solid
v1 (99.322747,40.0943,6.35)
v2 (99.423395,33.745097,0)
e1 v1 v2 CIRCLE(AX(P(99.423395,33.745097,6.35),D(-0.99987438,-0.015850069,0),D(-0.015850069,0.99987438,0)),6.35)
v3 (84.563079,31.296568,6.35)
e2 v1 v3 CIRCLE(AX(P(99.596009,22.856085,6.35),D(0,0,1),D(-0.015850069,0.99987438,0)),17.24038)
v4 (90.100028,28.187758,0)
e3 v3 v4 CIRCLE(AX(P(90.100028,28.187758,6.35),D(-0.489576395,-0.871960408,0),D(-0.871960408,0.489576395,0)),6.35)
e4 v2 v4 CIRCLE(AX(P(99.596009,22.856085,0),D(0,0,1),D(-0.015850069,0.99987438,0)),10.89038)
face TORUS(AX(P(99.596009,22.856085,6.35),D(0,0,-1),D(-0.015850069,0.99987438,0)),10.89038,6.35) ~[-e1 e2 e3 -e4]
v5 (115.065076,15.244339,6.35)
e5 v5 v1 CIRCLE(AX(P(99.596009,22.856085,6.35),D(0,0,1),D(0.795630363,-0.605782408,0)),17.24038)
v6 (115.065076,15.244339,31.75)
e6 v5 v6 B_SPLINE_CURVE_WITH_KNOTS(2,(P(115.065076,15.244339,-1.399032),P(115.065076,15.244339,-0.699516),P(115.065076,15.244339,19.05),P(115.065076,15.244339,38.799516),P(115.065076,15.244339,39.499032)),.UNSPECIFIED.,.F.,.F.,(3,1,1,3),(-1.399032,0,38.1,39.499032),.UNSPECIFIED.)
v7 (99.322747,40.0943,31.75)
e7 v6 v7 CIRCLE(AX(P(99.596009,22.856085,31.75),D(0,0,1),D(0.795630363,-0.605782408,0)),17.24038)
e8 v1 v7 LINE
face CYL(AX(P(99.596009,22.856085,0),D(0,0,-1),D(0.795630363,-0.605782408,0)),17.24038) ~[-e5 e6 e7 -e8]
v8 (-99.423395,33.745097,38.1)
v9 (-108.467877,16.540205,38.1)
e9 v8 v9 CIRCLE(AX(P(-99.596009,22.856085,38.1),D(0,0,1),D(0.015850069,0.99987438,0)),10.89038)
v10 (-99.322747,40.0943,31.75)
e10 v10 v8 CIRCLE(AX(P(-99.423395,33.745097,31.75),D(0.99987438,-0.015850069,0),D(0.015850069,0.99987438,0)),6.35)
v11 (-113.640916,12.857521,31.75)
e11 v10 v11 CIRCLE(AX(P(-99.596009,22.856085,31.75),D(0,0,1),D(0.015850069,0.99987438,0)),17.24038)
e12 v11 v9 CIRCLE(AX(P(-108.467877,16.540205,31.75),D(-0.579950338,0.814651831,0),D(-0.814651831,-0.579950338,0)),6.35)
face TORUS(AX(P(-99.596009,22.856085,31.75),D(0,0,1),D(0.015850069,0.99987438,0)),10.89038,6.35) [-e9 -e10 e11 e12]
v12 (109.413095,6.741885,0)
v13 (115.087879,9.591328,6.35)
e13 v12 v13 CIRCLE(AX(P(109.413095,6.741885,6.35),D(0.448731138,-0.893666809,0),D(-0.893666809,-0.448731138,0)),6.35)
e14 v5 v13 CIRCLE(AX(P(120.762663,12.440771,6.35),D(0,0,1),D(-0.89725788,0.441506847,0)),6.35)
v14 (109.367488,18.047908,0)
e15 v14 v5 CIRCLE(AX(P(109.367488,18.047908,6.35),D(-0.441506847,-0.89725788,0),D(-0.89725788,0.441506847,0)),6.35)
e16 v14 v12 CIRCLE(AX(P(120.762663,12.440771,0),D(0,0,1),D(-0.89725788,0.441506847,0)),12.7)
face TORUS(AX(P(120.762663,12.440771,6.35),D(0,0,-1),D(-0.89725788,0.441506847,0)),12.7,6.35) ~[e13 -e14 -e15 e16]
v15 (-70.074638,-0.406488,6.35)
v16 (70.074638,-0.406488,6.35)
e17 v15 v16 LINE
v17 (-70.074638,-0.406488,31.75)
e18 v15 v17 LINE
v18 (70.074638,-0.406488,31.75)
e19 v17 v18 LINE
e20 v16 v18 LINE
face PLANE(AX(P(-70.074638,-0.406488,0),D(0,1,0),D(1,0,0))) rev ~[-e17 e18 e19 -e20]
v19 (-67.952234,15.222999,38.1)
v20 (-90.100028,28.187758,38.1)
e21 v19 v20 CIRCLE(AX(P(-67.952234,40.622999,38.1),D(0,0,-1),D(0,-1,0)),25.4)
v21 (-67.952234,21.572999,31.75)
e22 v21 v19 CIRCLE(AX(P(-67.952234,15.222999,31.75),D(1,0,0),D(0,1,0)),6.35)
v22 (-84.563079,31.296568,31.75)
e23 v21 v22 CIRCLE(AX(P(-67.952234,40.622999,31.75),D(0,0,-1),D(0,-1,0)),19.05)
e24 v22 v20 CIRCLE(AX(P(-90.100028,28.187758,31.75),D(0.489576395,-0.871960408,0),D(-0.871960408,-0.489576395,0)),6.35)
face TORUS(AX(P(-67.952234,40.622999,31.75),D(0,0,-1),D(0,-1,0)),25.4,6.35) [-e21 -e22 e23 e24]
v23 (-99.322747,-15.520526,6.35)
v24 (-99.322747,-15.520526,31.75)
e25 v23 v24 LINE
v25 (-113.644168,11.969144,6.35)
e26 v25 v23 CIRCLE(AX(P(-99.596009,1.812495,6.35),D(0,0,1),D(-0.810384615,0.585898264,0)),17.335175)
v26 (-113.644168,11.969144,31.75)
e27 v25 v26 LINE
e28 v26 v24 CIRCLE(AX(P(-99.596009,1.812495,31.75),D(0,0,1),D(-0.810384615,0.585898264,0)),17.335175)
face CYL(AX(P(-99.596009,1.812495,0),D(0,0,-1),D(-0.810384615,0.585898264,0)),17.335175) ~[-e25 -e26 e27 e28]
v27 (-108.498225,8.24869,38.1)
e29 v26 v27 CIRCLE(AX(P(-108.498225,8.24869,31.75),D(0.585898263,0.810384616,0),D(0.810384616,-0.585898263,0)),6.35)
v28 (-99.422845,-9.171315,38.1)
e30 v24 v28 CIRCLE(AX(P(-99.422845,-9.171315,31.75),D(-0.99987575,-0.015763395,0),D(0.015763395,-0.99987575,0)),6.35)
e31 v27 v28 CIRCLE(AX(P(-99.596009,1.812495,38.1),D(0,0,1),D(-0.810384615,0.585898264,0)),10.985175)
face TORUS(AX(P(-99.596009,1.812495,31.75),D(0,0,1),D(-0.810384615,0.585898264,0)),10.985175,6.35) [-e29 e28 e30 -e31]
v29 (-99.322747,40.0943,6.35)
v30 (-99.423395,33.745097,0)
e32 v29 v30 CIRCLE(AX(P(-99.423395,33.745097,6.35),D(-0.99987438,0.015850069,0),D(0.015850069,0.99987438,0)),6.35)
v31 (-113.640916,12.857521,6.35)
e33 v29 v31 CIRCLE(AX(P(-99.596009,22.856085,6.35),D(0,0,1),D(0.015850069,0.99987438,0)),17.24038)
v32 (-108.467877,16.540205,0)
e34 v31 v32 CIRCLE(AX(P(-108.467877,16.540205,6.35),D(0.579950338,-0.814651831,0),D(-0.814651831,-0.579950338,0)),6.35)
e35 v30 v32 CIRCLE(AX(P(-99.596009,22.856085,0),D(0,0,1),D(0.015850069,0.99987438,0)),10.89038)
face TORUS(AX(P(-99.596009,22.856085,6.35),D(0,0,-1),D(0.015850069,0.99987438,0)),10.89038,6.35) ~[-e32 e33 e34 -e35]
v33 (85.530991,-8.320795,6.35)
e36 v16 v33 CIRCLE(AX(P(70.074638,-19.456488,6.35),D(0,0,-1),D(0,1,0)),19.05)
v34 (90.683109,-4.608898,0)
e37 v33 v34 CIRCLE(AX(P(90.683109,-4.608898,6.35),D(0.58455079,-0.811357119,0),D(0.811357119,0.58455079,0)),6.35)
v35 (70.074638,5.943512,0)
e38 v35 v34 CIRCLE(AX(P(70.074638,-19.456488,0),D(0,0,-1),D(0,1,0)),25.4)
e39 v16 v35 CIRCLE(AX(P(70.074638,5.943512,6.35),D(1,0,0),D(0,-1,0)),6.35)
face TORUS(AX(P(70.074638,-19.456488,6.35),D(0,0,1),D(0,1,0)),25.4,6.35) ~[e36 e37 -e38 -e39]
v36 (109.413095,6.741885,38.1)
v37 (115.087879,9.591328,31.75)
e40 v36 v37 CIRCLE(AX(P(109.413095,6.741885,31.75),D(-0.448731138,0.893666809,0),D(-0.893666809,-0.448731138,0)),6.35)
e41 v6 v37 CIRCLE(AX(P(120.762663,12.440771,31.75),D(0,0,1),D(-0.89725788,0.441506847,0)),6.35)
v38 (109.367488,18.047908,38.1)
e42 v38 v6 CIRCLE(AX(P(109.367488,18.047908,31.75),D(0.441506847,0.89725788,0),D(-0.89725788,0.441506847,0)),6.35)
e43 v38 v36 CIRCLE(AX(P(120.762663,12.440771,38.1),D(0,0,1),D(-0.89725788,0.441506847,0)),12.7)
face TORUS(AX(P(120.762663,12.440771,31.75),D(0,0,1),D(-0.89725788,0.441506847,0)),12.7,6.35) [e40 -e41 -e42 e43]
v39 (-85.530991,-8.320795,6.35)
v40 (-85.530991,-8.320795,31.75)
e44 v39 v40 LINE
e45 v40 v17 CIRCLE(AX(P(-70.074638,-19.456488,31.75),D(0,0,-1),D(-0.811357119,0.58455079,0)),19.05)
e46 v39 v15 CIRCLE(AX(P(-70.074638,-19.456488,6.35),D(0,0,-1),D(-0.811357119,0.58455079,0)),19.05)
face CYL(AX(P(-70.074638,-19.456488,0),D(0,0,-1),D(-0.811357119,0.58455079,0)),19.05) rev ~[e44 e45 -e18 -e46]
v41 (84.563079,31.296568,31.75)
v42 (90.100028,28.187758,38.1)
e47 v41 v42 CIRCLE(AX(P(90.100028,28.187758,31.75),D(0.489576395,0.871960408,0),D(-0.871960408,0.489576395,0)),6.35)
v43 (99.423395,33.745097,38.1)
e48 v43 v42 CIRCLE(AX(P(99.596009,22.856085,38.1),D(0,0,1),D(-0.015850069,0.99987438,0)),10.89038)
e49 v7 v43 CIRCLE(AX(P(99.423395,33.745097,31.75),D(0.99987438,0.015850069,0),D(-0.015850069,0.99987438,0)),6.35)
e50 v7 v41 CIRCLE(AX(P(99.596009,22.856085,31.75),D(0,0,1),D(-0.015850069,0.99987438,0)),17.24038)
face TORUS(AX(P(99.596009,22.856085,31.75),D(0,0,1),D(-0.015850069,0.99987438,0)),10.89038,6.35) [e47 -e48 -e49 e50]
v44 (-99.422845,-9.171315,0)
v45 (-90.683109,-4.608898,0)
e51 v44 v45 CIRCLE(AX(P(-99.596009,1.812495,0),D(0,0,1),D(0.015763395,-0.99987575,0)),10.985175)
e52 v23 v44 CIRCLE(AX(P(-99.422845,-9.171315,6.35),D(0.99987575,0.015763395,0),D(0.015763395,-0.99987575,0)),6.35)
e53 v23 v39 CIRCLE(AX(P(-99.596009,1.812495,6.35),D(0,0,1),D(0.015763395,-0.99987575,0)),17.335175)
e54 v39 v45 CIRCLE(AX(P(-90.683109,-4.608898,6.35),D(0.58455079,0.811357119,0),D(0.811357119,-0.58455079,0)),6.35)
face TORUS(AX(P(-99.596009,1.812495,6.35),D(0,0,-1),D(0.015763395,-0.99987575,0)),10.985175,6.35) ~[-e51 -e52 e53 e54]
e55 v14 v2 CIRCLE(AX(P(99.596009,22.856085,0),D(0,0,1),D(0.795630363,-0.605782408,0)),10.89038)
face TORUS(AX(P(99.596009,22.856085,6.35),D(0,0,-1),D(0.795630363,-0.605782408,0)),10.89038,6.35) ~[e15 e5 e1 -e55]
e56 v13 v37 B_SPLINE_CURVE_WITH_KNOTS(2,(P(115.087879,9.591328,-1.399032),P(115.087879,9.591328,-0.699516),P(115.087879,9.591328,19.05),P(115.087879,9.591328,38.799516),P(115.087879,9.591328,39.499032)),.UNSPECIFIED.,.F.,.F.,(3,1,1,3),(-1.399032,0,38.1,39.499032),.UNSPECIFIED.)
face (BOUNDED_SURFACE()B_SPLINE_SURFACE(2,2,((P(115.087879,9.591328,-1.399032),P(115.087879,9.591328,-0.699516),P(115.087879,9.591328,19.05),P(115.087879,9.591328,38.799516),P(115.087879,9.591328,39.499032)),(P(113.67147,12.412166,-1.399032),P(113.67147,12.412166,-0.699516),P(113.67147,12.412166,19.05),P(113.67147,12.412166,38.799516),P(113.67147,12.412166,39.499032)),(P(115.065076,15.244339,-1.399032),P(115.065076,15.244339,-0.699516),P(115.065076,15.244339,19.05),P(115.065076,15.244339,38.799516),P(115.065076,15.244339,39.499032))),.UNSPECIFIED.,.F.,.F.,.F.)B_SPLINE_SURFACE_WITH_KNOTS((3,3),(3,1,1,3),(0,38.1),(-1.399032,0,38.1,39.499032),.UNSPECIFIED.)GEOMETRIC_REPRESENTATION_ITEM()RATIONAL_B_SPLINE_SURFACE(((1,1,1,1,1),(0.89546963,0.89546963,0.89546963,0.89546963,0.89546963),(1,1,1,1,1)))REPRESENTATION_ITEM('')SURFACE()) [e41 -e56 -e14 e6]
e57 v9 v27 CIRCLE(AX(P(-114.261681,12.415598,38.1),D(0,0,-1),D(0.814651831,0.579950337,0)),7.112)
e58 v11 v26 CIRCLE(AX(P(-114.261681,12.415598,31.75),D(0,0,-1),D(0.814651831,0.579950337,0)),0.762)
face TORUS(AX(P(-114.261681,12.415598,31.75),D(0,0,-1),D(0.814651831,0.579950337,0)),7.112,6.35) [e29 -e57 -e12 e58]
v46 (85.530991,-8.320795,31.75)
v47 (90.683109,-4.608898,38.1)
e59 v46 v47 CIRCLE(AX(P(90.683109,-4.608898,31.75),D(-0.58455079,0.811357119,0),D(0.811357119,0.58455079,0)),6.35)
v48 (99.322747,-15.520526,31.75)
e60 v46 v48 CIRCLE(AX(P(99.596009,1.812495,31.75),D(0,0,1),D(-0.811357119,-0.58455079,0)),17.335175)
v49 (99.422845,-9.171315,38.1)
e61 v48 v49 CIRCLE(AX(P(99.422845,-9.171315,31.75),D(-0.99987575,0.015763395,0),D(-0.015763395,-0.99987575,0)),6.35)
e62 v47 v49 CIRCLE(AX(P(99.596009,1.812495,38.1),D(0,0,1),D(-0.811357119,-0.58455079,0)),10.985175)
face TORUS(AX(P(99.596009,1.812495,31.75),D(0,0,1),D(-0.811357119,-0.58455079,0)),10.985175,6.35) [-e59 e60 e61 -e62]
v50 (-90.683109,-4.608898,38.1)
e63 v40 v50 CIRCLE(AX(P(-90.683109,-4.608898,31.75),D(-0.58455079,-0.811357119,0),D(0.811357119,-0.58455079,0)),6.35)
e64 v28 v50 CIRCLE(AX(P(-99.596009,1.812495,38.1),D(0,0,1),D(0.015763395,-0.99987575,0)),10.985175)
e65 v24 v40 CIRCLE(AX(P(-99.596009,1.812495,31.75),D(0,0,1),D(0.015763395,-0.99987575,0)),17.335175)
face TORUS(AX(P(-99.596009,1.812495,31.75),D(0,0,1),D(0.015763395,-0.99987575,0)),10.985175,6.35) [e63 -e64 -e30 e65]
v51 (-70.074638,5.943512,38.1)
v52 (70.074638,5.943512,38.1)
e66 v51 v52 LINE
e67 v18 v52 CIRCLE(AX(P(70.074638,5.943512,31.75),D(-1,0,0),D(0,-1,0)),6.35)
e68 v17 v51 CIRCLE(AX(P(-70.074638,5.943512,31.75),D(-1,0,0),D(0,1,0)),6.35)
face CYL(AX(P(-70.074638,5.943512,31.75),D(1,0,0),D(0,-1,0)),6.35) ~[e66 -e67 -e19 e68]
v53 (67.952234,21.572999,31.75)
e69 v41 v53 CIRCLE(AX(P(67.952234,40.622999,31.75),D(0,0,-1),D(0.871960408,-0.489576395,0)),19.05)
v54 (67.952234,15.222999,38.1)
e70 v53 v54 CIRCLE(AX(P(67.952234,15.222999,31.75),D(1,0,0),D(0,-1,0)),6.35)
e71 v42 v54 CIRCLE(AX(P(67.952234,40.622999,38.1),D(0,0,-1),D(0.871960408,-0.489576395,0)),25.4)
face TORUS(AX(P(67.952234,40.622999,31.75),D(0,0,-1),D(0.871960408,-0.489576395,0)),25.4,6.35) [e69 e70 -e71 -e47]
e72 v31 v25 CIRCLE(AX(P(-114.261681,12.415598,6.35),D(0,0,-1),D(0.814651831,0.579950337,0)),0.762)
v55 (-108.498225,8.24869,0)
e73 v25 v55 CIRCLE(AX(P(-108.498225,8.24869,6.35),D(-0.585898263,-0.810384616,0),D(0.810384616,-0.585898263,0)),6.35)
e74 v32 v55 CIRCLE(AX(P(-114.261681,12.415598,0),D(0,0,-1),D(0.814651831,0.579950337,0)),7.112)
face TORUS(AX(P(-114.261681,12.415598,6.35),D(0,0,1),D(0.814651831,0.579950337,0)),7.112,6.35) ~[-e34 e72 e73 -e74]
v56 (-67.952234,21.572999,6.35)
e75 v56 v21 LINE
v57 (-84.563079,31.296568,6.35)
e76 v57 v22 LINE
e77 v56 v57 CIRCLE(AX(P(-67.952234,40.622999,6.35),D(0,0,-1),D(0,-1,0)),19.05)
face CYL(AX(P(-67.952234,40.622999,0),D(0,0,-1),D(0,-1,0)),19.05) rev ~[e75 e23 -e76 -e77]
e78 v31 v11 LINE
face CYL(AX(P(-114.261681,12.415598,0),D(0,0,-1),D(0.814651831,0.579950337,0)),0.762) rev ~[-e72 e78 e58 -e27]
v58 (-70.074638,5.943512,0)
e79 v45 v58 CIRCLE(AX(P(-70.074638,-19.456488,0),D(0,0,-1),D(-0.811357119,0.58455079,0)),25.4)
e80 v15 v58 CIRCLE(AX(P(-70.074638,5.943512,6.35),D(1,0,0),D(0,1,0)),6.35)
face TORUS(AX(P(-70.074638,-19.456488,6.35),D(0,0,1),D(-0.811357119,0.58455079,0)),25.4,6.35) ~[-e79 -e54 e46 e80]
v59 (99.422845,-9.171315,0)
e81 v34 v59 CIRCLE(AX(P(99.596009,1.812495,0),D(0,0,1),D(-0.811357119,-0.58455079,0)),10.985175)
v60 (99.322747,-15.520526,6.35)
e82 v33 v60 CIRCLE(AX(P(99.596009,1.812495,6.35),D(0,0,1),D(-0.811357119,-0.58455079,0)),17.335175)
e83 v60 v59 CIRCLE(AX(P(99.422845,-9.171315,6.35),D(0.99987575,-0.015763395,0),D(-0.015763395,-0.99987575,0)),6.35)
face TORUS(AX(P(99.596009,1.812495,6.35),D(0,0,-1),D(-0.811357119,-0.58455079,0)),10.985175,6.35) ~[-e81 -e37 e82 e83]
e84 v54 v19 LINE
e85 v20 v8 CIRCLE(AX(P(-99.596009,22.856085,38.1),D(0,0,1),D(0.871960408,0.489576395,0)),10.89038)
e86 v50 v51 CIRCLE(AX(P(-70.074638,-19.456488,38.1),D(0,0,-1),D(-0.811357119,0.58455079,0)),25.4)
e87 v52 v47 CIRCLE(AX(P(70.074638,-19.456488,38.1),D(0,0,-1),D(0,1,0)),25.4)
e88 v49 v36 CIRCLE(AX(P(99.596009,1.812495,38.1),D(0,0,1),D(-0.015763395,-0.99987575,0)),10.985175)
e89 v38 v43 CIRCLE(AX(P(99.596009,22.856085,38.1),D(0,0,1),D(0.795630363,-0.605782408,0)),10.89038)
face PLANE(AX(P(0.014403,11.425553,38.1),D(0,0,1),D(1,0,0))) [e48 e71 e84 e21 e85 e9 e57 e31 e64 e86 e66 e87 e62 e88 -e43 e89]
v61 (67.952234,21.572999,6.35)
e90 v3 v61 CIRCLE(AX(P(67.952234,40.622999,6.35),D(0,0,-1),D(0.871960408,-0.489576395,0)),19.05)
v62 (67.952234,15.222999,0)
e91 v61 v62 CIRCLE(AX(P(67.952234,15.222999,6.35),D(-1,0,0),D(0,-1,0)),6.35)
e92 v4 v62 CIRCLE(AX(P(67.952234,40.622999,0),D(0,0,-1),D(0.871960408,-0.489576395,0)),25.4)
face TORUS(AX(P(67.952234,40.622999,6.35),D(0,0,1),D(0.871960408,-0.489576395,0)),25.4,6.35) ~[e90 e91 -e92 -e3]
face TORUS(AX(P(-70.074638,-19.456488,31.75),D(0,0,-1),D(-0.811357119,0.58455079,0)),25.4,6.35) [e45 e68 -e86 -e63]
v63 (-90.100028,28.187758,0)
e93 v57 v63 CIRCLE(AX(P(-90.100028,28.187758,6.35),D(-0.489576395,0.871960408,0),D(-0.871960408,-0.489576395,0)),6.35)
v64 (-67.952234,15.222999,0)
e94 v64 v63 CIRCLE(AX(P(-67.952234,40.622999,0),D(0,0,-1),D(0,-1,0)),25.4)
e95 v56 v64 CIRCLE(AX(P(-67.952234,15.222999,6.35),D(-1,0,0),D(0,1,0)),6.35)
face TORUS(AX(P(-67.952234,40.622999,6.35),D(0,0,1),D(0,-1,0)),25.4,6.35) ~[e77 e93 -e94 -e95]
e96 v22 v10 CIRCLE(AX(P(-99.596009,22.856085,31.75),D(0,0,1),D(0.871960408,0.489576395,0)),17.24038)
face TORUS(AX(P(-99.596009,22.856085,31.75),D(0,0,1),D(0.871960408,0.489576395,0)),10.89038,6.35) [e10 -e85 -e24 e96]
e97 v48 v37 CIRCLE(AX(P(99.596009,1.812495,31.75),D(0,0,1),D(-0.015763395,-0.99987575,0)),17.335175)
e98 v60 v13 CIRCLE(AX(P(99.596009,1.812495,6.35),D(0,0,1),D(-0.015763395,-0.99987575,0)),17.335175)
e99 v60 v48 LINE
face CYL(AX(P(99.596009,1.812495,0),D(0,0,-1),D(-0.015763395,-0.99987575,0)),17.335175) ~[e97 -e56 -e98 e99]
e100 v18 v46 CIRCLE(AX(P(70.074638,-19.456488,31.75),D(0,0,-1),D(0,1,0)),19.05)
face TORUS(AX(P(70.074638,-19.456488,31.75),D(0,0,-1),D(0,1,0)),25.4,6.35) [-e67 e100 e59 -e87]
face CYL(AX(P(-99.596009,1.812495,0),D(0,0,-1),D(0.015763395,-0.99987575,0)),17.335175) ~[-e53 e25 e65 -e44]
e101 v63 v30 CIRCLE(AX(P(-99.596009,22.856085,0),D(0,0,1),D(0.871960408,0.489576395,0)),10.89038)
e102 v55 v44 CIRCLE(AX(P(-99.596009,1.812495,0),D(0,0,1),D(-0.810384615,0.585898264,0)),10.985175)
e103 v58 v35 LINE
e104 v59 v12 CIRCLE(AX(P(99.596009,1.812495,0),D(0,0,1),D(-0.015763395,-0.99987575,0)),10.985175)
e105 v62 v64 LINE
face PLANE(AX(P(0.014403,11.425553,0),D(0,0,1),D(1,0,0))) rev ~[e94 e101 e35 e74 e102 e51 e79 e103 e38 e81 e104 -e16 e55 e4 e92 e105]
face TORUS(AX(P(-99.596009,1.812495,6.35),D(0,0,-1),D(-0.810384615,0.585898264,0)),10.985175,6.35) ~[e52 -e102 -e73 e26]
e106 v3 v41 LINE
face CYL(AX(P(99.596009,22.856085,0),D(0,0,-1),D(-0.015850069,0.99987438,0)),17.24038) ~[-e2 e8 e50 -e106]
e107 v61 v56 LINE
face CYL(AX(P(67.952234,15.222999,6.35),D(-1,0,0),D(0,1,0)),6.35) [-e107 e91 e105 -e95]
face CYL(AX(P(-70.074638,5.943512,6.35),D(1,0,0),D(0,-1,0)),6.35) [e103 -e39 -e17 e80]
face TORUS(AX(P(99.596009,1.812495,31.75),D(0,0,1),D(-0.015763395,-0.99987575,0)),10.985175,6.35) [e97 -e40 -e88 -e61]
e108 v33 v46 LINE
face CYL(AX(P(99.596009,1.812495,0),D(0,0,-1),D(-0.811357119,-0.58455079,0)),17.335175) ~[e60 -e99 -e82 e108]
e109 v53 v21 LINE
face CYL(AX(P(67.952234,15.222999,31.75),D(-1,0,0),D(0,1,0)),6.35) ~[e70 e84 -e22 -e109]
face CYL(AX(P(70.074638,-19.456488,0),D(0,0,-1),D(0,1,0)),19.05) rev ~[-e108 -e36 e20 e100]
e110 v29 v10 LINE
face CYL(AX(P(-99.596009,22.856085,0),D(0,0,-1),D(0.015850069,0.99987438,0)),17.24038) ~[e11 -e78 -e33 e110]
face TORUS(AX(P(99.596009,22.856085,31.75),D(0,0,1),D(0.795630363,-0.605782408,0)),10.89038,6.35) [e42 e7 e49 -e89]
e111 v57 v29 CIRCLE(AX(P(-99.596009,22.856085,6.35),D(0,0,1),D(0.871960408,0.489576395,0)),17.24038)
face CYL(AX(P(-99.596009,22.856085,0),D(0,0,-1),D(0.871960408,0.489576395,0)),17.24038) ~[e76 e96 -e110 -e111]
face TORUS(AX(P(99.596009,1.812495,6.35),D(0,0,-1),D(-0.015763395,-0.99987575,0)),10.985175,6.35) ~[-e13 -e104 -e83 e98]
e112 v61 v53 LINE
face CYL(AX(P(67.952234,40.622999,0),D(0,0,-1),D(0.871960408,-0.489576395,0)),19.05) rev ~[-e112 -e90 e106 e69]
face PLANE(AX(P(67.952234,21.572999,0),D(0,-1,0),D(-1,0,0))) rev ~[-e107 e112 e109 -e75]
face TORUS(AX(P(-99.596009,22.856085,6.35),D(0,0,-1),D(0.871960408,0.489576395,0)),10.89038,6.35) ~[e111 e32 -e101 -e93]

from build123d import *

# Parameters (mm, degrees)
F1_DEPTH = 12.7
F2_SCALE = 3
F3_R     = 6.35


with BuildPart() as f1:
    # F0 (on Top) → F1 (new body)
    with BuildSketch(Plane.XY):
        with BuildLine():
            Line((22.650744566, 7.190999575), (0, 7.190999575))
            Line((0, 7.190999575), (-22.650744566, 7.190999575))
            ThreePointArc((-22.650744566, 7.190999575), (-25.858668803, 8.0608789477), (-28.1876931588, 10.432189468))
            ThreePointArc((-28.1876931588, 10.432189468), (-30.2562615135, 12.5550773402), (-33.1075824797, 13.3647666037))
            ThreePointArc((-33.1075824797, 13.3647666037), (-38.2854180827, 10.2927602437), (-37.8803053875, 4.2858402083))
            ThreePointArc((-37.8803053875, 4.2858402083), (-37.833228654, 4.137603143), (-37.8813892603, 3.9897146635))
            ThreePointArc((-37.8813892603, 3.9897146635), (-38.3233098407, -2.0656424962), (-33.1075824797, -5.1735086816))
            ThreePointArc((-33.1075824797, -5.1735086816), (-30.5246049962, -4.5182552091), (-28.51033034, -2.7735983939))
            ThreePointArc((-28.51033034, -2.7735983939), (-26.2523403785, -0.8333702379), (-23.3582126367, -0.1354959101))
            Line((-23.3582126367, -0.1354959101), (0, -0.1354959101))
            Line((0, -0.1354959101), (23.3582126367, -0.1354959101))
            ThreePointArc((23.3582126367, -0.1354959101), (26.2523403785, -0.8333702379), (28.51033034, -2.7735983939))
            ThreePointArc((28.51033034, -2.7735983939), (30.5246049962, -4.5182552091), (33.1075824797, -5.1735086816))
            ThreePointArc((33.1075824797, -5.1735086816), (38.3652517819, -1.983544068), (37.7709929375, 4.1373886349))
            ThreePointArc((37.7709929375, 4.1373886349), (38.3276553946, 10.2108253524), (33.1075824797, 13.3647666037))
            ThreePointArc((33.1075824797, 13.3647666037), (30.2562615135, 12.5550773402), (28.1876931588, 10.432189468))
            ThreePointArc((28.1876931588, 10.432189468), (25.858668803, 8.0608789477), (22.650744566, 7.190999575))
        make_face()
    extrude(amount=F1_DEPTH)


with BuildPart() as f1_1:
    # F2: moved
    add(f1.part.scale(F2_SCALE))

    # F3
    f3_edges = [f1_1.edges().sort_by_distance(p)[0] for p in [
        (77.576006, 24.182637, 0),
        (0, 21.572999, 0),
        (-77.576006, 24.182637, 0),
        (-108.828758, 37.41586, 0),
        (-113.499686, 12.412809, 0),
        (-109.740982, -12.244098, 0),
        (-78.757021, -2.500111, 0),
        (0, -0.406488, 0),
        (78.757021, -2.500111, 0),
        (109.96395, -12.080456, 0),
        (109.061108, 37.265895, 0),
        (113.312979, 12.412166, 19.05),
        (77.576006, 24.182637, 38.1),
        (0, 21.572999, 38.1),
        (-77.576006, 24.182637, 38.1),
        (-108.828758, 37.41586, 38.1),
        (-113.499686, 12.412809, 38.1),
        (-109.740982, -12.244098, 38.1),
        (-78.757021, -2.500111, 38.1),
        (0, -0.406488, 38.1),
        (78.757021, -2.500111, 38.1),
        (109.96395, -12.080456, 38.1),
        (109.061108, 37.265895, 38.1),
    ]]
    fillet(f3_edges, radius=F3_R)


solid = f1_1.part
